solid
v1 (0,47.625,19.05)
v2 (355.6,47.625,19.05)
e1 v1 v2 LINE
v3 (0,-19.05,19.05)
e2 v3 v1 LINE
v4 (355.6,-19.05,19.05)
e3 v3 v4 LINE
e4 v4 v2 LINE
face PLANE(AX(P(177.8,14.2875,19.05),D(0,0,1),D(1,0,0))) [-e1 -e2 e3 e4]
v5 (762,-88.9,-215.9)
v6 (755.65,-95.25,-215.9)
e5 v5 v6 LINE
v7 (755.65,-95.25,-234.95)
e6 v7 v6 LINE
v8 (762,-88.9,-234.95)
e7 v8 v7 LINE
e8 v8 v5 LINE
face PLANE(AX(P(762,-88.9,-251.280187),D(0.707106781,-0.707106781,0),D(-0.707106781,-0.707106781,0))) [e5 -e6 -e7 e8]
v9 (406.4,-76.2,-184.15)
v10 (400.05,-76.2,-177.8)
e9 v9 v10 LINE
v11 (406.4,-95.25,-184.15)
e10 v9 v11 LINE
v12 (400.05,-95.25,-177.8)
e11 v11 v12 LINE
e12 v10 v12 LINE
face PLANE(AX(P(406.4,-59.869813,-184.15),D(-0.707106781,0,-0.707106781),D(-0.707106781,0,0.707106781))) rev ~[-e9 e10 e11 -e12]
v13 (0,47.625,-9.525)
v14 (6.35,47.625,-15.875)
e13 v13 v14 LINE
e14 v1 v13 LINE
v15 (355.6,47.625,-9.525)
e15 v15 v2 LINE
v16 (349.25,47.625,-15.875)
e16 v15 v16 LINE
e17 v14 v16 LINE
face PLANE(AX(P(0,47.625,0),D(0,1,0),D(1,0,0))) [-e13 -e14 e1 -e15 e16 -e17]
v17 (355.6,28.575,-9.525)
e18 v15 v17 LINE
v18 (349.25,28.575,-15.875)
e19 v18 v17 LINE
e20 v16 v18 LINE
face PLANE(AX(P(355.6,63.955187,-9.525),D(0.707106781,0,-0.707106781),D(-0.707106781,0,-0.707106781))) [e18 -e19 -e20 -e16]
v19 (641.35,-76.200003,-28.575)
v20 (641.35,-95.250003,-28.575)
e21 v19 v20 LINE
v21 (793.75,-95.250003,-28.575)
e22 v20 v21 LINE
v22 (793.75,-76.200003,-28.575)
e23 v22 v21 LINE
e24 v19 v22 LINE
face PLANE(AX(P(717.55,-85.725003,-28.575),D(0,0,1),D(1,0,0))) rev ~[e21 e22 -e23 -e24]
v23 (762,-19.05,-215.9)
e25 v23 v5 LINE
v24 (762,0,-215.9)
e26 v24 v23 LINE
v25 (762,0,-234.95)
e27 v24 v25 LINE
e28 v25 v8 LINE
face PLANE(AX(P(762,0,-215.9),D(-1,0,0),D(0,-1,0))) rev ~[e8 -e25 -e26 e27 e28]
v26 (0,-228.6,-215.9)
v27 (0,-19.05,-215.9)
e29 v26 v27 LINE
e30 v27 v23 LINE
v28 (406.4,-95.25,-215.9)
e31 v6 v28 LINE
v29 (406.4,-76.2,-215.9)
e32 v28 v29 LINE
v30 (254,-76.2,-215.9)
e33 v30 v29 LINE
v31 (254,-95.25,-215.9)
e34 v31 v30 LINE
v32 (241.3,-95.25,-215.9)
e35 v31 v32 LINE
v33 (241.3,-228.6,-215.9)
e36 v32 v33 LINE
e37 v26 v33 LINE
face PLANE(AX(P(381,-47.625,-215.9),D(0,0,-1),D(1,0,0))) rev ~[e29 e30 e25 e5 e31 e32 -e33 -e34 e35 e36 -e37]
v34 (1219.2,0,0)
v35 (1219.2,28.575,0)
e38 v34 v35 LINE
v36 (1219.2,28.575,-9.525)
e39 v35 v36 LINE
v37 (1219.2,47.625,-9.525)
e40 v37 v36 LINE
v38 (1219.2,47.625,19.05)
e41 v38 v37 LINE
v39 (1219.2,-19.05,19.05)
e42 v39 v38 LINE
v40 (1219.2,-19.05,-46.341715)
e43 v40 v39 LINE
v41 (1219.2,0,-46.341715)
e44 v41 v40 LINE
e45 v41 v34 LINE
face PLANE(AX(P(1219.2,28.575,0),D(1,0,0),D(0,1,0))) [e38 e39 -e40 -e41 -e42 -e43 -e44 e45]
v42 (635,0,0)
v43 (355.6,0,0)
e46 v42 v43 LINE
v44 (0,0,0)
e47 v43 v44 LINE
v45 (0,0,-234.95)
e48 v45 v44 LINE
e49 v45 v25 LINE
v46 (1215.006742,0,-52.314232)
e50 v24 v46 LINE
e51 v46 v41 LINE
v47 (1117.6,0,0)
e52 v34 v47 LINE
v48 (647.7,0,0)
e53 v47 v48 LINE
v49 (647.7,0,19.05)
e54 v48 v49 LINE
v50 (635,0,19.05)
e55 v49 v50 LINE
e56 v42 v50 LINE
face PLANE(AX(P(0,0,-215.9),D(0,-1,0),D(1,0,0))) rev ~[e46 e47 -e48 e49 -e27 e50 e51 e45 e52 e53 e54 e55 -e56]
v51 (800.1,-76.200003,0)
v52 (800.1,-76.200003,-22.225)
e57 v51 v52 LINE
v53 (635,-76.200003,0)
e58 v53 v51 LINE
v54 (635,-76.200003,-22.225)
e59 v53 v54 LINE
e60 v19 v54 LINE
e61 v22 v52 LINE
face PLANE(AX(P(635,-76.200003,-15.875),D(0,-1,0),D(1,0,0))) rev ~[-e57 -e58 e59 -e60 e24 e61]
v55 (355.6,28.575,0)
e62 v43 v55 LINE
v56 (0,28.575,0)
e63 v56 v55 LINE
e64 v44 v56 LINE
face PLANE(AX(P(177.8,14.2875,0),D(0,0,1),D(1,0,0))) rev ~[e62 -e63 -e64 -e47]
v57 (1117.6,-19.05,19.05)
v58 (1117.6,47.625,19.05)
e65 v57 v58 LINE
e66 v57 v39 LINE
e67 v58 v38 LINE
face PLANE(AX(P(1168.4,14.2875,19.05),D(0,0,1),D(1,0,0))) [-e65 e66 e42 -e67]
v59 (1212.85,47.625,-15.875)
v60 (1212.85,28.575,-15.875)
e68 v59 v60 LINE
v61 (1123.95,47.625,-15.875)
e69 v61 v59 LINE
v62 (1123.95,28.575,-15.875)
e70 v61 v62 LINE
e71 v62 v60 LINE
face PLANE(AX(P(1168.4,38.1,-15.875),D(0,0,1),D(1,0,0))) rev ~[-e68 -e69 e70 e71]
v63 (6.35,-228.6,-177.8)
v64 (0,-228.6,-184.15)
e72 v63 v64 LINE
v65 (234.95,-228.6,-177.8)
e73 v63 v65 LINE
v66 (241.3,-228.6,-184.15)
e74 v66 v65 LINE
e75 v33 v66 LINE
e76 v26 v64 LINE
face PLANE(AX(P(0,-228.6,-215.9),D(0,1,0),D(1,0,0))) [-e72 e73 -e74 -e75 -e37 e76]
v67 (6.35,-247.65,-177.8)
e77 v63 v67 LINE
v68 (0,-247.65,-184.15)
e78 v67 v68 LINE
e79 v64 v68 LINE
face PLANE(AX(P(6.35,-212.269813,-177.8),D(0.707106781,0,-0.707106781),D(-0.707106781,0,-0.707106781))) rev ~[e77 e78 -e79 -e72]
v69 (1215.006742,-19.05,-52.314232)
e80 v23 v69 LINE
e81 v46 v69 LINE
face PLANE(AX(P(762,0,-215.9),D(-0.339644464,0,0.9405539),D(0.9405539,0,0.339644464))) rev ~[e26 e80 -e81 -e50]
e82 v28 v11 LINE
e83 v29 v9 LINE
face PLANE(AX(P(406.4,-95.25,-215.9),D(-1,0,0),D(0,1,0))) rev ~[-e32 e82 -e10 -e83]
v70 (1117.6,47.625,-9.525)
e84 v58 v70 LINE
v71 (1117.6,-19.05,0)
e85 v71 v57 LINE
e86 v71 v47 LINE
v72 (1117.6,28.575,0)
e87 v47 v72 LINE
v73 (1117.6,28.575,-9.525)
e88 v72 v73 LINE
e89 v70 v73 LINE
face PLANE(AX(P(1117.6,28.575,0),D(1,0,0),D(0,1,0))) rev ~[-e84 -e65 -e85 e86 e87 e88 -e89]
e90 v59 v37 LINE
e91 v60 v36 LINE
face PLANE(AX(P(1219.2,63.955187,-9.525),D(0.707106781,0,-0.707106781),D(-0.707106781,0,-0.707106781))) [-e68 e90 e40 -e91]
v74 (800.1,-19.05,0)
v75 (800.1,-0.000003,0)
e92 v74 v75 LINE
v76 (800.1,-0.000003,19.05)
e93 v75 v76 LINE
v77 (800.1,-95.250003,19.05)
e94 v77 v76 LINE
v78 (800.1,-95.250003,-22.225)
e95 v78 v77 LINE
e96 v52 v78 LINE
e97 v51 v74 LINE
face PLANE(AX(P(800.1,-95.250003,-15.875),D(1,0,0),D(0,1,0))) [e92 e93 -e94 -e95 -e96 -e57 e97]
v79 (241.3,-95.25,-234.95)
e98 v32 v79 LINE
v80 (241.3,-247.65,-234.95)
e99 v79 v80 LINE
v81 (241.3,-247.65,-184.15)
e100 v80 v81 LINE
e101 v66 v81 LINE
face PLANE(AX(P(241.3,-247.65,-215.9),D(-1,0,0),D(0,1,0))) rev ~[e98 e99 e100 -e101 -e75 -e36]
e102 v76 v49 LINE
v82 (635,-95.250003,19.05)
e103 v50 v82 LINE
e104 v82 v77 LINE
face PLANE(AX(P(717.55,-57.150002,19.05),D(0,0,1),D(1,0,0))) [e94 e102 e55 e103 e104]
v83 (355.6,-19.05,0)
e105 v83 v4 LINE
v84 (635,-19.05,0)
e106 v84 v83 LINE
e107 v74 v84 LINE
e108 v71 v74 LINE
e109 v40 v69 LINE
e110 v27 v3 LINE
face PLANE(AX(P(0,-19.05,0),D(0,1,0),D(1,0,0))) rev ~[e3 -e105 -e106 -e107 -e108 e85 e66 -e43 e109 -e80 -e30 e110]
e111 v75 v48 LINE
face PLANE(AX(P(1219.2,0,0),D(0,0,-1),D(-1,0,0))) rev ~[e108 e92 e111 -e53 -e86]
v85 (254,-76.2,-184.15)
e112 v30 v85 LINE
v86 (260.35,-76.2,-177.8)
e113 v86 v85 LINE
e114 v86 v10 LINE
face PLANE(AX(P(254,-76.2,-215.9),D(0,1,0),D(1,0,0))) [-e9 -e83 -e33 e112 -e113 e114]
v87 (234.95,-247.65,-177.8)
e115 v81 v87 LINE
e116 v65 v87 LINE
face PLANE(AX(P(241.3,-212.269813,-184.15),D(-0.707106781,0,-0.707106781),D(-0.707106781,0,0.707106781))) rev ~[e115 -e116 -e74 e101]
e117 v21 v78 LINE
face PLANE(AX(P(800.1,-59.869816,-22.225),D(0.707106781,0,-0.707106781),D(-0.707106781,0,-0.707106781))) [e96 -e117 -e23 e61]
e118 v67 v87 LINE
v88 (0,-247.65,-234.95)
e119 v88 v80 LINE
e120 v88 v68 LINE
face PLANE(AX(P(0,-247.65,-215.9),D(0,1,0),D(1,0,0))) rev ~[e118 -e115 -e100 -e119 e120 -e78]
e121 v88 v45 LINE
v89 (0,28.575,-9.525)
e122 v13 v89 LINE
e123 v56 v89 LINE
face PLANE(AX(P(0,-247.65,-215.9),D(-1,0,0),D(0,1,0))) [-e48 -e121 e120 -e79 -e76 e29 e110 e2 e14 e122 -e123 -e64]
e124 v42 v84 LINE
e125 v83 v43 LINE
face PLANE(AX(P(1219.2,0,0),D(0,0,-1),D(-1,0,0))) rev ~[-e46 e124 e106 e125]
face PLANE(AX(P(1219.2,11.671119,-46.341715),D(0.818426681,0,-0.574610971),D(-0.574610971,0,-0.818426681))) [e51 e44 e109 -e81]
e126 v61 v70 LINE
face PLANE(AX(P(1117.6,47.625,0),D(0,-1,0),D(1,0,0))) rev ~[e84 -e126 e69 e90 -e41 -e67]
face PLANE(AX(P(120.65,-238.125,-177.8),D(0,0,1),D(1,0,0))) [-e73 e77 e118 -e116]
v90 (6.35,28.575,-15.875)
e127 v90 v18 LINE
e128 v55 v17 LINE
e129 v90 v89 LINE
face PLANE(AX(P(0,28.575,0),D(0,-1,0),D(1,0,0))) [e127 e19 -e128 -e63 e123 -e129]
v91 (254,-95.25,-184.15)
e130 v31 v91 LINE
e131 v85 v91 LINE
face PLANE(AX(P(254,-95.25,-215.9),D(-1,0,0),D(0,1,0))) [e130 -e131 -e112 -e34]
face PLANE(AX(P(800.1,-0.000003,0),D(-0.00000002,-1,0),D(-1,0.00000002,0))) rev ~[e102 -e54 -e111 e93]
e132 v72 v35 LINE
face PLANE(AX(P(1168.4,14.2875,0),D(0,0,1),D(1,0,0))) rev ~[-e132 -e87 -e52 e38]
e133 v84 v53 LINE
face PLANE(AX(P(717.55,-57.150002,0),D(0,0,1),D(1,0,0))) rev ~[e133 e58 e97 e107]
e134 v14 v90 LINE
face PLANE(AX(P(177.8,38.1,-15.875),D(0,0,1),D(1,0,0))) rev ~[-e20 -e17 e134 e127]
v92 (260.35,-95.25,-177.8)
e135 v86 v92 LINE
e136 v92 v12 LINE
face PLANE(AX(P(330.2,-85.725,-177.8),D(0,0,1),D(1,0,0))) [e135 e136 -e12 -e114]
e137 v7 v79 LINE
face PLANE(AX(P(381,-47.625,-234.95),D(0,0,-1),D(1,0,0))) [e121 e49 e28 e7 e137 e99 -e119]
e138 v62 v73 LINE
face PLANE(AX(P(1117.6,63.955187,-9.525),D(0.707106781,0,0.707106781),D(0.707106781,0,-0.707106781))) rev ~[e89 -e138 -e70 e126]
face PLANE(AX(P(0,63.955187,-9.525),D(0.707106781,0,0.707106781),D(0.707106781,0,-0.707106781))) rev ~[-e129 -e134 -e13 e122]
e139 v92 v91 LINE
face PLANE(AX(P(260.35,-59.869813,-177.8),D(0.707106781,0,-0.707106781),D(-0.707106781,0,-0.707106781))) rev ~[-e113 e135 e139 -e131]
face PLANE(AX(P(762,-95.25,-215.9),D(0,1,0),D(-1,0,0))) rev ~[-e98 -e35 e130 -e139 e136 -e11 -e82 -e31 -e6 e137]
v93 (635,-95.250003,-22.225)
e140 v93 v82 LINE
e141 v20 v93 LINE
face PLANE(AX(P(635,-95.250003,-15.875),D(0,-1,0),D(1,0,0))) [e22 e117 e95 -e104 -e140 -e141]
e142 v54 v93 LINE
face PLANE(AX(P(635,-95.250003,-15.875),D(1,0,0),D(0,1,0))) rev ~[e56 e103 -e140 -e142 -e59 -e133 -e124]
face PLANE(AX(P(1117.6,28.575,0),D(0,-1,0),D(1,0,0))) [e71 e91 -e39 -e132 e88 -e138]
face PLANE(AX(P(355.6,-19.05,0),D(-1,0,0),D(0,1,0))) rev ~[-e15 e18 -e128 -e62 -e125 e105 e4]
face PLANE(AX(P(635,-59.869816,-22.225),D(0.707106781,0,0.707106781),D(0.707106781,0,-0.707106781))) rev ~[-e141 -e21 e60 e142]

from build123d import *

# Parameters (mm, degrees)
F1_DEPTH      = 19.05
F2_W          = 355.6
F2_H          = 66.675
F2_W_2        = 101.6
F2_W_3        = 165.1
F2_H_2        = 76.2000030398
F3_DEPTH      = 19.05
F4_W          = 101.6
F4_H          = 19.05
F4_W_2        = 355.6
F4_W_3        = 165.1
F5_DEPTH      = 15.875
F6_W          = 241.3
F6_H          = 152.4
F7_DEPTH      = 19.05
F8_W          = 241.3
F8_H          = 19.05
F8_W_2        = 152.4
F9_DEPTH      = 38.1
F10_DEPTH     = 12.7
F11_T1_DEPTH  = 51.7103739472
F11_T3_DEPTH  = 51.7103739472
F11_T5_DEPTH  = 51.7103739472
F11_T7_DEPTH  = 51.7103739472
F11_T9_DEPTH  = 51.7103739472
F11_T11_DEPTH = 42.3922386312


# Not quite as in the source:
# - a fillet or chamfer that OpenCascade refuses, or shapes differently, is made with other operations: its cross-section is extruded or revolved along the edge and cut away or added
# - ends of sketch curves that miss each other by under 0.0002 mm in the source are joined


with BuildPart() as f1:
    # F0 (on Front) → F1 (new body)
    with BuildSketch(Plane.XZ):
        Polygon((1219.2, 0), (0, 0), (0, -215.9), (762, -215.9), (1219.2, -50.8), align=None)
    extrude(amount=F1_DEPTH)

    # F2 (on face) → F3 (join)
    with BuildSketch(Plane.XY):
        with Locations((177.8, 14.2875)):
            Rectangle(F2_W, F2_H)
        with Locations((1168.4, 14.2875)):
            Rectangle(F2_W_2, F2_H)
        with Locations((717.55, -57.1500015199)):
            Rectangle(F2_W_3, F2_H_2)
        Polygon((635, 0), (635, -19.05), (800.1, -19.05), (800.1, -3.0398e-06), (647.7, 0), align=None)
    extrude(amount=F3_DEPTH)

    # F4 (on face) → F5 (join)
    with BuildSketch(Plane.XY):
        with Locations((1168.4, 38.1)):
            Rectangle(F4_W, F4_H)
        with Locations((177.8, 38.1)):
            Rectangle(F4_W_2, F4_H)
        with Locations((717.55, -85.7250030398)):
            Rectangle(F4_W_3, F4_H)
    extrude(amount=-F5_DEPTH)

    # F6 (on face) → F7 (join)
    with BuildSketch(Plane(origin=(0, 0, -215.9), x_dir=(1, 0, 0), z_dir=(0, 0, -1))):
        Polygon((0, 95.25), (0, 0), (762, 0), (762, 95.25), (241.3, 95.25), align=None)
        with Locations((120.65, 171.45)):
            Rectangle(F6_W, F6_H)
    extrude(amount=F7_DEPTH)

    # F8 (on face) → F9 (join)
    with BuildSketch(Plane.XY.offset(-215.9)):
        with Locations((120.65, -238.125)):
            Rectangle(F8_W, F8_H)
        with Locations((330.2, -85.725)):
            Rectangle(F8_W_2, F8_H)
    extrude(amount=F9_DEPTH)

    # F10 (add): a face of the model
    f10_faces = [f1.faces().sort_by_distance(p)[0] for p in [
        (717.55, -85.7250030398, -15.875),
    ]]
    extrude(f10_faces, amount=F10_DEPTH)

    # F11: chamfer of 6.35 on 12 edges, made by hand

    # F11_s2 → F11_t1 (cut)
    with BuildSketch(Plane.XZ.offset(212.2698130264)):
        Polygon((6.35, -177.8), (0, -184.15), (0, -177.8), align=None)
        Polygon((241.3, -184.15), (234.95, -177.8), (241.3, -177.8), align=None)
    extrude(amount=F11_T1_DEPTH, mode=Mode.SUBTRACT)

    # F11_s4 → F11_t3 (cut)
    with BuildSketch(Plane.XZ.offset(59.8698130264)):
        Polygon((260.35, -177.8), (254, -184.15), (254, -177.8), align=None)
        Polygon((406.4, -184.15), (400.05, -177.8), (406.4, -177.8), align=None)
    extrude(amount=F11_T3_DEPTH, mode=Mode.SUBTRACT)

    # F11_s6 → F11_t5 (cut)
    with BuildSketch(Plane.XZ.offset(59.8698160663)):
        Polygon((800.1, -22.225), (793.75, -28.575), (800.1, -28.575), align=None)
        Polygon((635, -22.225), (641.35, -28.575), (635, -28.575), align=None)
    extrude(amount=F11_T5_DEPTH, mode=Mode.SUBTRACT)

    # F11_s8 → F11_t7 (cut)
    with BuildSketch(Plane.XY.offset(-251.2801869736)):
        Polygon((762, -88.9), (755.65, -95.25), (762, -95.25), align=None)
    extrude(amount=F11_T7_DEPTH, mode=Mode.SUBTRACT)

    # F11_s10 → F11_t9 (cut)
    with BuildSketch(Plane.XZ.offset(-63.9551869736)):
        Polygon((1219.2, -9.525), (1212.85, -15.875), (1219.2, -15.875), align=None)
        Polygon((355.6, -9.525), (349.25, -15.875), (355.6, -15.875), align=None)
        Polygon((1117.6, -9.525), (1123.95, -15.875), (1117.6, -15.875), align=None)
        Polygon((0, -9.525), (6.35, -15.875), (0, -15.875), align=None)
    extrude(amount=F11_T9_DEPTH, mode=Mode.SUBTRACT)

    # F11_s12 → F11_t11 (cut)
    with BuildSketch(Plane.XZ.offset(-11.6711193156)):
        Polygon((1219.2, -46.3417146679), (1215.006742345, -52.314231931), (1219.2, -50.8), align=None)
    extrude(amount=F11_T11_DEPTH, mode=Mode.SUBTRACT)


solid = f1.part
